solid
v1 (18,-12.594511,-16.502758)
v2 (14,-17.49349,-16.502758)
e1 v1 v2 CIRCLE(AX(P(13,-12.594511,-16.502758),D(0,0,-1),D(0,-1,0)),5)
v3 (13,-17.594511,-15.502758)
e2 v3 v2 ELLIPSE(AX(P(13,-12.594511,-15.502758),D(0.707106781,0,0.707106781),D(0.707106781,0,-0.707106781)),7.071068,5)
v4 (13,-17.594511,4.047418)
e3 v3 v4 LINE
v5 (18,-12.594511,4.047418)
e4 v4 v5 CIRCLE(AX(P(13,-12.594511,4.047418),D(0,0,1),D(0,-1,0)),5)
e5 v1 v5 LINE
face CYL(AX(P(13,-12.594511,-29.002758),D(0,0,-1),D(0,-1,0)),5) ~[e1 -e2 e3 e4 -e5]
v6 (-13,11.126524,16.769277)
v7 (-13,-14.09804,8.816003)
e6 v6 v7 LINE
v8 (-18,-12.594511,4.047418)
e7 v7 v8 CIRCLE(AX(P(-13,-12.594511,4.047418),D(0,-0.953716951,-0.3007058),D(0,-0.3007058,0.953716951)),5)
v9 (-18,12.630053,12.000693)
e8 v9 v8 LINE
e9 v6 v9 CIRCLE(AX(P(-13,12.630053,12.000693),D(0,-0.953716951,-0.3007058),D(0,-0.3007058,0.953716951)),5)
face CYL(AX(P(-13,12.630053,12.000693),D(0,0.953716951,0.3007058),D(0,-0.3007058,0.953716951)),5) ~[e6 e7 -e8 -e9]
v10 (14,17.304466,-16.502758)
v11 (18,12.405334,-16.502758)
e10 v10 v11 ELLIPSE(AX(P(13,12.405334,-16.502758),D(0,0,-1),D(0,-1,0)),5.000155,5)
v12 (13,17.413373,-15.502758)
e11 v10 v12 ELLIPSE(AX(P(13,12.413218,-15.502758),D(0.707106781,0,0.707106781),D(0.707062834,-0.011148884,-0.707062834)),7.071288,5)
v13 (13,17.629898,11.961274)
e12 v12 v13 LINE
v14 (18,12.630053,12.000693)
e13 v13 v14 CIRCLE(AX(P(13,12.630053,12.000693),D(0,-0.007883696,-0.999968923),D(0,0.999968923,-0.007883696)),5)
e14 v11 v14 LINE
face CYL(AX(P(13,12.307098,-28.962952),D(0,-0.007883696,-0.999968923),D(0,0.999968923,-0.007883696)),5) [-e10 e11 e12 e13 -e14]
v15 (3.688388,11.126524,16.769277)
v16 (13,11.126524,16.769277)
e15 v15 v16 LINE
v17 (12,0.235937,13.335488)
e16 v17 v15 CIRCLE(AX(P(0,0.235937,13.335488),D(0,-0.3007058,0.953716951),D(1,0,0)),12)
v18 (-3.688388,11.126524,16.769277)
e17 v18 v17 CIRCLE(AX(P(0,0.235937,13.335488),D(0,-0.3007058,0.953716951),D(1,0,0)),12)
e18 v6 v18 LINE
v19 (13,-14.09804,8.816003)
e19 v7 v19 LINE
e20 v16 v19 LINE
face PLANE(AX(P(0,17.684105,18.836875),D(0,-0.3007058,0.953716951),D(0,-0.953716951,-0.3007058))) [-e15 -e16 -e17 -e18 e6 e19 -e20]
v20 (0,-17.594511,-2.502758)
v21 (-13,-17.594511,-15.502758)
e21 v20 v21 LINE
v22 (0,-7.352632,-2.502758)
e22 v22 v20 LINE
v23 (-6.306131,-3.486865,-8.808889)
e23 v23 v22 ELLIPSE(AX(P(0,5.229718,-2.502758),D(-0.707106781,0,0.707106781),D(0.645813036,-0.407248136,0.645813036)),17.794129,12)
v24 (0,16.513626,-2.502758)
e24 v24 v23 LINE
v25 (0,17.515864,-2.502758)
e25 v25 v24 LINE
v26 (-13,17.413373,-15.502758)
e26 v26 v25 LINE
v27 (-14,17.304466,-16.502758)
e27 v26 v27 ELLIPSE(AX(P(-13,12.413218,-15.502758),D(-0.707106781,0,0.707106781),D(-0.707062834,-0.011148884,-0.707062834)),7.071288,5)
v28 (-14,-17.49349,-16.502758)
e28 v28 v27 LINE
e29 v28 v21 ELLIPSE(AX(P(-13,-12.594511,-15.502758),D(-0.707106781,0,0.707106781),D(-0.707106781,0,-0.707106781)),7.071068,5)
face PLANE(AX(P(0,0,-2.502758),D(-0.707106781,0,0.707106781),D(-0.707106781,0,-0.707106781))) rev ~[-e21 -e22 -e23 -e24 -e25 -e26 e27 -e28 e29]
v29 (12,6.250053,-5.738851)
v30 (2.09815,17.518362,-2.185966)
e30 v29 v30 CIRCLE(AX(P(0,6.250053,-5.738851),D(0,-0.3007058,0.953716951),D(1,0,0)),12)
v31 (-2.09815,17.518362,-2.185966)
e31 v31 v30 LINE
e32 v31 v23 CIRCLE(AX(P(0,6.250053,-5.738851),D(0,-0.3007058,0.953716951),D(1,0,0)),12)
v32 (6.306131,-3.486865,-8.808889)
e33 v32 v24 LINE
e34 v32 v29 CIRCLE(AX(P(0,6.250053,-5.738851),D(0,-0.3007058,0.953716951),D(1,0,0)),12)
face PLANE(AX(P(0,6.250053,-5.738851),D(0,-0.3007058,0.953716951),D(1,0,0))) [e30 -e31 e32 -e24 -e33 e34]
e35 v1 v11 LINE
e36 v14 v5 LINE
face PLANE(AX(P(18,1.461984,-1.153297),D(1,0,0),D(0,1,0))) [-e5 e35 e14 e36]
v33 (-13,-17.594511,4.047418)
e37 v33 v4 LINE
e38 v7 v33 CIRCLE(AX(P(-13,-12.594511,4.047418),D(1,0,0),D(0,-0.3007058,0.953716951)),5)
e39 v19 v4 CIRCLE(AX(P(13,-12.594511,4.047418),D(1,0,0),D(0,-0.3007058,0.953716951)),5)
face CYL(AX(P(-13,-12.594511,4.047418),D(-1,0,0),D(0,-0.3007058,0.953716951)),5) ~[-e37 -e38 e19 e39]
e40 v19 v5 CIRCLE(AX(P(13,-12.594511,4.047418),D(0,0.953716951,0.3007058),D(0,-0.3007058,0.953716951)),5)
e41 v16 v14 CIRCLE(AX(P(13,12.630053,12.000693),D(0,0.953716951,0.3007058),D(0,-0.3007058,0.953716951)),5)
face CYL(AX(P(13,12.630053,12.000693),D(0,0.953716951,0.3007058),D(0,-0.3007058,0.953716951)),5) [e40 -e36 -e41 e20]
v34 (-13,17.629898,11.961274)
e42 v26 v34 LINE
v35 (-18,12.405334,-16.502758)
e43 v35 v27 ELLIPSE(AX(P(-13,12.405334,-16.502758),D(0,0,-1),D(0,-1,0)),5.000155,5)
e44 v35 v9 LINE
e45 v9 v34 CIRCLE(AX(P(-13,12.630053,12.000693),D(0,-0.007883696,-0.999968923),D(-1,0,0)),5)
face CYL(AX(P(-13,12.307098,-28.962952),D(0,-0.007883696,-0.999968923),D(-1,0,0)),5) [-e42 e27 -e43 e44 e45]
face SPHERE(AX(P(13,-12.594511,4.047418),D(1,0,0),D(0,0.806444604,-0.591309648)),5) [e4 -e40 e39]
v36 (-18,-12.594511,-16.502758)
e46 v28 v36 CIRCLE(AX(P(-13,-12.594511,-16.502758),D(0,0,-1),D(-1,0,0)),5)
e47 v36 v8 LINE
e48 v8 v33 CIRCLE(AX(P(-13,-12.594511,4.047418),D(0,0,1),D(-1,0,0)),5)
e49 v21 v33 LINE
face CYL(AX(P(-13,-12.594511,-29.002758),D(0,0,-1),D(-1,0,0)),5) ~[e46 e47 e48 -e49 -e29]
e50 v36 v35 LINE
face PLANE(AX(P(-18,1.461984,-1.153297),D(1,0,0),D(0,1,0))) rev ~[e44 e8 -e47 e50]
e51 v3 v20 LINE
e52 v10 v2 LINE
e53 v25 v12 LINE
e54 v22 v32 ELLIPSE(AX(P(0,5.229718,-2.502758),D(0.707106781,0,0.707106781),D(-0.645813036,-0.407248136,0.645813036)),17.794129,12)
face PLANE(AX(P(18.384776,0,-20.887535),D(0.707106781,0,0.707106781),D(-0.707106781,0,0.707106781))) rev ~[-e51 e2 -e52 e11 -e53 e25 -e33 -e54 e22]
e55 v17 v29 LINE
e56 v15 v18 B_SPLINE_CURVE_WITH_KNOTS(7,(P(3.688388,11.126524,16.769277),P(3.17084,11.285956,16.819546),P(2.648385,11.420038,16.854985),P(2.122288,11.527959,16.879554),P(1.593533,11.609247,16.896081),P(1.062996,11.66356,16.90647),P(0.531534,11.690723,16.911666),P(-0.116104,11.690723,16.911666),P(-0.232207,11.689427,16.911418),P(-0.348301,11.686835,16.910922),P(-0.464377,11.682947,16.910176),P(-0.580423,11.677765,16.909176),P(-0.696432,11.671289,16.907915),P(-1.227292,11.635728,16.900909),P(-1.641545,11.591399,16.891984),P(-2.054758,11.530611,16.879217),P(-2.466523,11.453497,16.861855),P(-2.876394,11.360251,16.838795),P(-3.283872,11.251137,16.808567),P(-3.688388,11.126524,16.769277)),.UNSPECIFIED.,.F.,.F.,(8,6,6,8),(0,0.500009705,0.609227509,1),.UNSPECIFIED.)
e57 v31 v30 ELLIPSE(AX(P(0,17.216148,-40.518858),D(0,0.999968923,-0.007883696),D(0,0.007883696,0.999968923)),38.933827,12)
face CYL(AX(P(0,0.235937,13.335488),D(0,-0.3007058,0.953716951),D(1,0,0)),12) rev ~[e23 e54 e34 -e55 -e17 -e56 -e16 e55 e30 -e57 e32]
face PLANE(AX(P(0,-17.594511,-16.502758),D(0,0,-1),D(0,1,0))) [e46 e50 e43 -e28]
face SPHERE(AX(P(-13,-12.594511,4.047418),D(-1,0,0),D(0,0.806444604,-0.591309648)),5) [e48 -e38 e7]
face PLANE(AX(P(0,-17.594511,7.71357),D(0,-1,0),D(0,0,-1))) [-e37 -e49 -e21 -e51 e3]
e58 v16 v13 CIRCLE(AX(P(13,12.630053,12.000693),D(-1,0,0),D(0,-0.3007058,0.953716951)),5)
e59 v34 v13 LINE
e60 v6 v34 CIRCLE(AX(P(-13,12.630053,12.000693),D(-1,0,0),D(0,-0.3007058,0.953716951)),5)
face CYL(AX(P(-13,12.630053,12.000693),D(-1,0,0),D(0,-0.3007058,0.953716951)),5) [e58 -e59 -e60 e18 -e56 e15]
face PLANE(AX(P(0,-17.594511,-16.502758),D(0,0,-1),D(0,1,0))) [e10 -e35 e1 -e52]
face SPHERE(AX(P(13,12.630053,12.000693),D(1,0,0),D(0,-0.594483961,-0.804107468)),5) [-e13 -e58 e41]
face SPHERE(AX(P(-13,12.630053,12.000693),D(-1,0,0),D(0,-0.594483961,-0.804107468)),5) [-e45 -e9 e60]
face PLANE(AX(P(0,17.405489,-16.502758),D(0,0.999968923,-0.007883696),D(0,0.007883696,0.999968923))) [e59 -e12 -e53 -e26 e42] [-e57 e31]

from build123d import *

# Parameters (mm, degrees)
F1_DEPTH     = 18
F2_R         = 12
F3_DEPTH     = 20
F5_DEPTH     = 19
F6_T1_DEPTH  = 33.0501766006
F6_T3_DEPTH  = 26
F6_T5_DEPTH  = 26.4486901769
F6_T7_DEPTH  = 40.9649172436
F6_T12_DEPTH = 5
F6_T18_DEPTH = 5
F6_T24_DEPTH = 5
F6_T30_DEPTH = 5


# Not quite as in the source:
# - a fillet or chamfer that OpenCascade refuses, or shapes differently, is made with other operations: its cross-section is extruded or revolved along the edge and cut away or added


with BuildPart() as f1:
    # F0 (on Right) → F1 (new body, symmetric)
    with BuildSketch(Plane.YZ):
        Polygon((-17.5945106894, -16.5027584881), (17.4054893106, -16.5027584881), (17.6841049034, 18.8368745636), (-17.5945106894, 7.7135697939), align=None)
    extrude(amount=F1_DEPTH, both=True)

    # F2 (on face) → F3 (cut)
    with BuildSketch(Plane(origin=(0, -3.8031265819, 12.0619764999), x_dir=(1, 0, 0), z_dir=(0, -0.3007057995, 0.9537169507))):
        with Locations((0, 4.2350762524)):
            Circle(F2_R)
    extrude(amount=-F3_DEPTH, mode=Mode.SUBTRACT)

    # F4 (on Front) → F5 (cut, symmetric)
    with BuildSketch(Plane.XZ):
        Polygon((18.3847763109, -20.8875347989), (0, -2.5027584881), (-18.3847763109, -20.8875347989), (0, -39.2723111098), align=None)
    extrude(amount=F5_DEPTH, both=True, mode=Mode.SUBTRACT)

    # F6: fillet of radius 5 on 8 edges, made by hand

    # F6_s2 → F6_t1 (cut)
    with BuildSketch(Plane.XY.offset(-29.0027584881)):
        with BuildLine():
            ThreePointArc((-18, -12.5945106894), (-16.5355339059, -16.1300445953), (-13, -17.5945106894))
            Line((-13, -17.5945106894), (-18, -17.5945106894))
            Line((-18, -17.5945106894), (-18, -12.5945106894))
        make_face()
        with BuildLine():
            ThreePointArc((13, -17.5945106894), (16.5355339059, -16.1300445953), (18, -12.5945106894))
            Line((18, -12.5945106894), (18, -17.5945106894))
            Line((18, -17.5945106894), (13, -17.5945106894))
        make_face()
    extrude(amount=F6_T1_DEPTH, mode=Mode.SUBTRACT)

    # F6_s4 → F6_t3 (cut)
    with BuildSketch(Plane.YZ.offset(-13)):
        with BuildLine():
            ThreePointArc((-14.0980396869, 8.8160028663), (-16.6267337107, 7.0039663544), (-17.5945106894, 4.0474181125))
            Line((-17.5945106894, 4.0474181125), (-17.5945106894, 7.7135697939))
            Line((-17.5945106894, 7.7135697939), (-14.0980396869, 8.8160028663))
        make_face()
        with BuildLine():
            ThreePointArc((11.1265244599, 16.7692773918), (15.6024732635, 16.0212299773), (17.6298980733, 11.9612741565))
            Line((17.6298980733, 11.9612741565), (17.6841049034, 18.8368745636))
            Line((17.6841049034, 18.8368745636), (11.1265244599, 16.7692773918))
        make_face()
    extrude(amount=F6_T3_DEPTH, mode=Mode.SUBTRACT)

    # F6_s6 → F6_t5 (cut)
    with BuildSketch(Plane(origin=(0, 14.9296510418, 4.7073008919), x_dir=(1, 0, 0), z_dir=(0, -0.9537169507, -0.3007057995))):
        with BuildLine():
            ThreePointArc((-13, 12.6473336669), (-16.5355339059, 11.1828675728), (-18, 7.6473336669))
            Line((-18, 7.6473336669), (-18, 12.6473336669))
            Line((-18, 12.6473336669), (-13, 12.6473336669))
        make_face()
        with BuildLine():
            ThreePointArc((13, 12.6473336669), (16.5355339059, 11.1828675728), (18, 7.6473336669))
            Line((18, 7.6473336669), (18, 12.6473336669))
            Line((18, 12.6473336669), (13, 12.6473336669))
        make_face()
    extrude(amount=F6_T5_DEPTH, mode=Mode.SUBTRACT)

    # F6_s8 → F6_t7 (cut)
    with BuildSketch(Plane(origin=(0, -0.227563099, -28.8641290101), x_dir=(1, 0, 0), z_dir=(0, 0.0078836963, 0.9999689232))):
        with BuildLine():
            ThreePointArc((13, 17.5350511394), (16.5355339059, 16.0705850454), (18, 12.5350511394))
            Line((18, 12.5350511394), (18, 17.5350511394))
            Line((18, 17.5350511394), (13, 17.5350511394))
        make_face()
        with BuildLine():
            ThreePointArc((-18, 12.5350511394), (-16.5355339059, 16.0705850454), (-13, 17.5350511394))
            Line((-13, 17.5350511394), (-18, 17.5350511394))
            Line((-18, 17.5350511394), (-18, 12.5350511394))
        make_face()
    extrude(amount=F6_T7_DEPTH, mode=Mode.SUBTRACT)


with BuildPart() as f6_tool10:
    # F6_s11 → F6_t12 (new body)
    with BuildSketch(Plane.YZ.offset(-13)):
        Polygon((-12.5945106894, 4.0474181125), (-17.5945106894, 4.0474181125), (-17.5945106894, 7.7135697939), (-14.0980396869, 8.8160028663), align=None)
    extrude(amount=-F6_T12_DEPTH)

    # F6_s13 → F6_t14 (revolve, cut)
    with BuildSketch(Plane(origin=(-13, -12.5945106894, 4.0474181125), x_dir=(0, 0.8064446043, -0.5913096484), z_dir=(0, 0.5913096484, 0.8064446043))):
        with BuildLine():
            ThreePointArc((0, -5), (5, 0), (0, 5))
            Line((0, 5), (0, -5))
        make_face()
    revolve(axis=Axis((-13, -12.5945106894, 4.0474181125), (-1, 0, 0)), mode=Mode.SUBTRACT)


with BuildPart() as f1_1:
    add(f1.part)

    # F6_t9: cut F6_tool10
    add(f6_tool10.part, mode=Mode.SUBTRACT)


with BuildPart() as f6_tool16:
    # F6_s17 → F6_t18 (new body)
    with BuildSketch(Plane.YZ.offset(13)):
        Polygon((-12.5945106894, 4.0474181125), (-14.0980396869, 8.8160028663), (-17.5945106894, 7.7135697939), (-17.5945106894, 4.0474181125), align=None)
    extrude(amount=F6_T18_DEPTH)

    # F6_s19 → F6_t20 (revolve, cut)
    with BuildSketch(Plane(origin=(13, -12.5945106894, 4.0474181125), x_dir=(0, 0.8064446043, -0.5913096484), z_dir=(0, -0.5913096484, -0.8064446043))):
        with BuildLine():
            ThreePointArc((0, -5), (5, 0), (0, 5))
            Line((0, 5), (0, -5))
        make_face()
    revolve(axis=Axis((13, -12.5945106894, 4.0474181125), (1, 0, 0)), mode=Mode.SUBTRACT)


with BuildPart() as f1_2:
    add(f1_1.part)

    # F6_t15: cut F6_tool16
    add(f6_tool16.part, mode=Mode.SUBTRACT)


with BuildPart() as f6_tool22:
    # F6_s23 → F6_t24 (new body)
    with BuildSketch(Plane.YZ.offset(-13)):
        Polygon((12.6300534574, 12.000692638), (17.6298980733, 11.9612741565), (17.6841049034, 18.8368745636), (11.1265244599, 16.7692773918), align=None)
    extrude(amount=-F6_T24_DEPTH)

    # F6_s25 → F6_t26 (revolve, cut)
    with BuildSketch(Plane(origin=(-13, 12.6300534574, 12.000692638), x_dir=(0, -0.5944839612, -0.8041074679), z_dir=(0, 0.8041074679, -0.5944839612))):
        with BuildLine():
            ThreePointArc((0, -5), (5, 0), (0, 5))
            Line((0, 5), (0, -5))
        make_face()
    revolve(axis=Axis((-13, 12.6300534574, 12.000692638), (-1, 0, 0)), mode=Mode.SUBTRACT)


with BuildPart() as f1_3:
    add(f1_2.part)

    # F6_t21: cut F6_tool22
    add(f6_tool22.part, mode=Mode.SUBTRACT)


with BuildPart() as f6_tool28:
    # F6_s29 → F6_t30 (new body)
    with BuildSketch(Plane.YZ.offset(13)):
        Polygon((12.6300534574, 12.000692638), (11.1265244599, 16.7692773918), (17.6841049034, 18.8368745636), (17.6298980733, 11.9612741565), align=None)
    extrude(amount=F6_T30_DEPTH)

    # F6_s31 → F6_t32 (revolve, cut)
    with BuildSketch(Plane(origin=(13, 12.6300534574, 12.000692638), x_dir=(0, -0.5944839612, -0.8041074679), z_dir=(0, -0.8041074679, 0.5944839612))):
        with BuildLine():
            ThreePointArc((0, -5), (5, 0), (0, 5))
            Line((0, 5), (0, -5))
        make_face()
    revolve(axis=Axis((13, 12.6300534574, 12.000692638), (1, 0, 0)), mode=Mode.SUBTRACT)


with BuildPart() as f1_4:
    add(f1_3.part)

    # F6_t27: cut F6_tool28
    add(f6_tool28.part, mode=Mode.SUBTRACT)


solid = f1_4.part
